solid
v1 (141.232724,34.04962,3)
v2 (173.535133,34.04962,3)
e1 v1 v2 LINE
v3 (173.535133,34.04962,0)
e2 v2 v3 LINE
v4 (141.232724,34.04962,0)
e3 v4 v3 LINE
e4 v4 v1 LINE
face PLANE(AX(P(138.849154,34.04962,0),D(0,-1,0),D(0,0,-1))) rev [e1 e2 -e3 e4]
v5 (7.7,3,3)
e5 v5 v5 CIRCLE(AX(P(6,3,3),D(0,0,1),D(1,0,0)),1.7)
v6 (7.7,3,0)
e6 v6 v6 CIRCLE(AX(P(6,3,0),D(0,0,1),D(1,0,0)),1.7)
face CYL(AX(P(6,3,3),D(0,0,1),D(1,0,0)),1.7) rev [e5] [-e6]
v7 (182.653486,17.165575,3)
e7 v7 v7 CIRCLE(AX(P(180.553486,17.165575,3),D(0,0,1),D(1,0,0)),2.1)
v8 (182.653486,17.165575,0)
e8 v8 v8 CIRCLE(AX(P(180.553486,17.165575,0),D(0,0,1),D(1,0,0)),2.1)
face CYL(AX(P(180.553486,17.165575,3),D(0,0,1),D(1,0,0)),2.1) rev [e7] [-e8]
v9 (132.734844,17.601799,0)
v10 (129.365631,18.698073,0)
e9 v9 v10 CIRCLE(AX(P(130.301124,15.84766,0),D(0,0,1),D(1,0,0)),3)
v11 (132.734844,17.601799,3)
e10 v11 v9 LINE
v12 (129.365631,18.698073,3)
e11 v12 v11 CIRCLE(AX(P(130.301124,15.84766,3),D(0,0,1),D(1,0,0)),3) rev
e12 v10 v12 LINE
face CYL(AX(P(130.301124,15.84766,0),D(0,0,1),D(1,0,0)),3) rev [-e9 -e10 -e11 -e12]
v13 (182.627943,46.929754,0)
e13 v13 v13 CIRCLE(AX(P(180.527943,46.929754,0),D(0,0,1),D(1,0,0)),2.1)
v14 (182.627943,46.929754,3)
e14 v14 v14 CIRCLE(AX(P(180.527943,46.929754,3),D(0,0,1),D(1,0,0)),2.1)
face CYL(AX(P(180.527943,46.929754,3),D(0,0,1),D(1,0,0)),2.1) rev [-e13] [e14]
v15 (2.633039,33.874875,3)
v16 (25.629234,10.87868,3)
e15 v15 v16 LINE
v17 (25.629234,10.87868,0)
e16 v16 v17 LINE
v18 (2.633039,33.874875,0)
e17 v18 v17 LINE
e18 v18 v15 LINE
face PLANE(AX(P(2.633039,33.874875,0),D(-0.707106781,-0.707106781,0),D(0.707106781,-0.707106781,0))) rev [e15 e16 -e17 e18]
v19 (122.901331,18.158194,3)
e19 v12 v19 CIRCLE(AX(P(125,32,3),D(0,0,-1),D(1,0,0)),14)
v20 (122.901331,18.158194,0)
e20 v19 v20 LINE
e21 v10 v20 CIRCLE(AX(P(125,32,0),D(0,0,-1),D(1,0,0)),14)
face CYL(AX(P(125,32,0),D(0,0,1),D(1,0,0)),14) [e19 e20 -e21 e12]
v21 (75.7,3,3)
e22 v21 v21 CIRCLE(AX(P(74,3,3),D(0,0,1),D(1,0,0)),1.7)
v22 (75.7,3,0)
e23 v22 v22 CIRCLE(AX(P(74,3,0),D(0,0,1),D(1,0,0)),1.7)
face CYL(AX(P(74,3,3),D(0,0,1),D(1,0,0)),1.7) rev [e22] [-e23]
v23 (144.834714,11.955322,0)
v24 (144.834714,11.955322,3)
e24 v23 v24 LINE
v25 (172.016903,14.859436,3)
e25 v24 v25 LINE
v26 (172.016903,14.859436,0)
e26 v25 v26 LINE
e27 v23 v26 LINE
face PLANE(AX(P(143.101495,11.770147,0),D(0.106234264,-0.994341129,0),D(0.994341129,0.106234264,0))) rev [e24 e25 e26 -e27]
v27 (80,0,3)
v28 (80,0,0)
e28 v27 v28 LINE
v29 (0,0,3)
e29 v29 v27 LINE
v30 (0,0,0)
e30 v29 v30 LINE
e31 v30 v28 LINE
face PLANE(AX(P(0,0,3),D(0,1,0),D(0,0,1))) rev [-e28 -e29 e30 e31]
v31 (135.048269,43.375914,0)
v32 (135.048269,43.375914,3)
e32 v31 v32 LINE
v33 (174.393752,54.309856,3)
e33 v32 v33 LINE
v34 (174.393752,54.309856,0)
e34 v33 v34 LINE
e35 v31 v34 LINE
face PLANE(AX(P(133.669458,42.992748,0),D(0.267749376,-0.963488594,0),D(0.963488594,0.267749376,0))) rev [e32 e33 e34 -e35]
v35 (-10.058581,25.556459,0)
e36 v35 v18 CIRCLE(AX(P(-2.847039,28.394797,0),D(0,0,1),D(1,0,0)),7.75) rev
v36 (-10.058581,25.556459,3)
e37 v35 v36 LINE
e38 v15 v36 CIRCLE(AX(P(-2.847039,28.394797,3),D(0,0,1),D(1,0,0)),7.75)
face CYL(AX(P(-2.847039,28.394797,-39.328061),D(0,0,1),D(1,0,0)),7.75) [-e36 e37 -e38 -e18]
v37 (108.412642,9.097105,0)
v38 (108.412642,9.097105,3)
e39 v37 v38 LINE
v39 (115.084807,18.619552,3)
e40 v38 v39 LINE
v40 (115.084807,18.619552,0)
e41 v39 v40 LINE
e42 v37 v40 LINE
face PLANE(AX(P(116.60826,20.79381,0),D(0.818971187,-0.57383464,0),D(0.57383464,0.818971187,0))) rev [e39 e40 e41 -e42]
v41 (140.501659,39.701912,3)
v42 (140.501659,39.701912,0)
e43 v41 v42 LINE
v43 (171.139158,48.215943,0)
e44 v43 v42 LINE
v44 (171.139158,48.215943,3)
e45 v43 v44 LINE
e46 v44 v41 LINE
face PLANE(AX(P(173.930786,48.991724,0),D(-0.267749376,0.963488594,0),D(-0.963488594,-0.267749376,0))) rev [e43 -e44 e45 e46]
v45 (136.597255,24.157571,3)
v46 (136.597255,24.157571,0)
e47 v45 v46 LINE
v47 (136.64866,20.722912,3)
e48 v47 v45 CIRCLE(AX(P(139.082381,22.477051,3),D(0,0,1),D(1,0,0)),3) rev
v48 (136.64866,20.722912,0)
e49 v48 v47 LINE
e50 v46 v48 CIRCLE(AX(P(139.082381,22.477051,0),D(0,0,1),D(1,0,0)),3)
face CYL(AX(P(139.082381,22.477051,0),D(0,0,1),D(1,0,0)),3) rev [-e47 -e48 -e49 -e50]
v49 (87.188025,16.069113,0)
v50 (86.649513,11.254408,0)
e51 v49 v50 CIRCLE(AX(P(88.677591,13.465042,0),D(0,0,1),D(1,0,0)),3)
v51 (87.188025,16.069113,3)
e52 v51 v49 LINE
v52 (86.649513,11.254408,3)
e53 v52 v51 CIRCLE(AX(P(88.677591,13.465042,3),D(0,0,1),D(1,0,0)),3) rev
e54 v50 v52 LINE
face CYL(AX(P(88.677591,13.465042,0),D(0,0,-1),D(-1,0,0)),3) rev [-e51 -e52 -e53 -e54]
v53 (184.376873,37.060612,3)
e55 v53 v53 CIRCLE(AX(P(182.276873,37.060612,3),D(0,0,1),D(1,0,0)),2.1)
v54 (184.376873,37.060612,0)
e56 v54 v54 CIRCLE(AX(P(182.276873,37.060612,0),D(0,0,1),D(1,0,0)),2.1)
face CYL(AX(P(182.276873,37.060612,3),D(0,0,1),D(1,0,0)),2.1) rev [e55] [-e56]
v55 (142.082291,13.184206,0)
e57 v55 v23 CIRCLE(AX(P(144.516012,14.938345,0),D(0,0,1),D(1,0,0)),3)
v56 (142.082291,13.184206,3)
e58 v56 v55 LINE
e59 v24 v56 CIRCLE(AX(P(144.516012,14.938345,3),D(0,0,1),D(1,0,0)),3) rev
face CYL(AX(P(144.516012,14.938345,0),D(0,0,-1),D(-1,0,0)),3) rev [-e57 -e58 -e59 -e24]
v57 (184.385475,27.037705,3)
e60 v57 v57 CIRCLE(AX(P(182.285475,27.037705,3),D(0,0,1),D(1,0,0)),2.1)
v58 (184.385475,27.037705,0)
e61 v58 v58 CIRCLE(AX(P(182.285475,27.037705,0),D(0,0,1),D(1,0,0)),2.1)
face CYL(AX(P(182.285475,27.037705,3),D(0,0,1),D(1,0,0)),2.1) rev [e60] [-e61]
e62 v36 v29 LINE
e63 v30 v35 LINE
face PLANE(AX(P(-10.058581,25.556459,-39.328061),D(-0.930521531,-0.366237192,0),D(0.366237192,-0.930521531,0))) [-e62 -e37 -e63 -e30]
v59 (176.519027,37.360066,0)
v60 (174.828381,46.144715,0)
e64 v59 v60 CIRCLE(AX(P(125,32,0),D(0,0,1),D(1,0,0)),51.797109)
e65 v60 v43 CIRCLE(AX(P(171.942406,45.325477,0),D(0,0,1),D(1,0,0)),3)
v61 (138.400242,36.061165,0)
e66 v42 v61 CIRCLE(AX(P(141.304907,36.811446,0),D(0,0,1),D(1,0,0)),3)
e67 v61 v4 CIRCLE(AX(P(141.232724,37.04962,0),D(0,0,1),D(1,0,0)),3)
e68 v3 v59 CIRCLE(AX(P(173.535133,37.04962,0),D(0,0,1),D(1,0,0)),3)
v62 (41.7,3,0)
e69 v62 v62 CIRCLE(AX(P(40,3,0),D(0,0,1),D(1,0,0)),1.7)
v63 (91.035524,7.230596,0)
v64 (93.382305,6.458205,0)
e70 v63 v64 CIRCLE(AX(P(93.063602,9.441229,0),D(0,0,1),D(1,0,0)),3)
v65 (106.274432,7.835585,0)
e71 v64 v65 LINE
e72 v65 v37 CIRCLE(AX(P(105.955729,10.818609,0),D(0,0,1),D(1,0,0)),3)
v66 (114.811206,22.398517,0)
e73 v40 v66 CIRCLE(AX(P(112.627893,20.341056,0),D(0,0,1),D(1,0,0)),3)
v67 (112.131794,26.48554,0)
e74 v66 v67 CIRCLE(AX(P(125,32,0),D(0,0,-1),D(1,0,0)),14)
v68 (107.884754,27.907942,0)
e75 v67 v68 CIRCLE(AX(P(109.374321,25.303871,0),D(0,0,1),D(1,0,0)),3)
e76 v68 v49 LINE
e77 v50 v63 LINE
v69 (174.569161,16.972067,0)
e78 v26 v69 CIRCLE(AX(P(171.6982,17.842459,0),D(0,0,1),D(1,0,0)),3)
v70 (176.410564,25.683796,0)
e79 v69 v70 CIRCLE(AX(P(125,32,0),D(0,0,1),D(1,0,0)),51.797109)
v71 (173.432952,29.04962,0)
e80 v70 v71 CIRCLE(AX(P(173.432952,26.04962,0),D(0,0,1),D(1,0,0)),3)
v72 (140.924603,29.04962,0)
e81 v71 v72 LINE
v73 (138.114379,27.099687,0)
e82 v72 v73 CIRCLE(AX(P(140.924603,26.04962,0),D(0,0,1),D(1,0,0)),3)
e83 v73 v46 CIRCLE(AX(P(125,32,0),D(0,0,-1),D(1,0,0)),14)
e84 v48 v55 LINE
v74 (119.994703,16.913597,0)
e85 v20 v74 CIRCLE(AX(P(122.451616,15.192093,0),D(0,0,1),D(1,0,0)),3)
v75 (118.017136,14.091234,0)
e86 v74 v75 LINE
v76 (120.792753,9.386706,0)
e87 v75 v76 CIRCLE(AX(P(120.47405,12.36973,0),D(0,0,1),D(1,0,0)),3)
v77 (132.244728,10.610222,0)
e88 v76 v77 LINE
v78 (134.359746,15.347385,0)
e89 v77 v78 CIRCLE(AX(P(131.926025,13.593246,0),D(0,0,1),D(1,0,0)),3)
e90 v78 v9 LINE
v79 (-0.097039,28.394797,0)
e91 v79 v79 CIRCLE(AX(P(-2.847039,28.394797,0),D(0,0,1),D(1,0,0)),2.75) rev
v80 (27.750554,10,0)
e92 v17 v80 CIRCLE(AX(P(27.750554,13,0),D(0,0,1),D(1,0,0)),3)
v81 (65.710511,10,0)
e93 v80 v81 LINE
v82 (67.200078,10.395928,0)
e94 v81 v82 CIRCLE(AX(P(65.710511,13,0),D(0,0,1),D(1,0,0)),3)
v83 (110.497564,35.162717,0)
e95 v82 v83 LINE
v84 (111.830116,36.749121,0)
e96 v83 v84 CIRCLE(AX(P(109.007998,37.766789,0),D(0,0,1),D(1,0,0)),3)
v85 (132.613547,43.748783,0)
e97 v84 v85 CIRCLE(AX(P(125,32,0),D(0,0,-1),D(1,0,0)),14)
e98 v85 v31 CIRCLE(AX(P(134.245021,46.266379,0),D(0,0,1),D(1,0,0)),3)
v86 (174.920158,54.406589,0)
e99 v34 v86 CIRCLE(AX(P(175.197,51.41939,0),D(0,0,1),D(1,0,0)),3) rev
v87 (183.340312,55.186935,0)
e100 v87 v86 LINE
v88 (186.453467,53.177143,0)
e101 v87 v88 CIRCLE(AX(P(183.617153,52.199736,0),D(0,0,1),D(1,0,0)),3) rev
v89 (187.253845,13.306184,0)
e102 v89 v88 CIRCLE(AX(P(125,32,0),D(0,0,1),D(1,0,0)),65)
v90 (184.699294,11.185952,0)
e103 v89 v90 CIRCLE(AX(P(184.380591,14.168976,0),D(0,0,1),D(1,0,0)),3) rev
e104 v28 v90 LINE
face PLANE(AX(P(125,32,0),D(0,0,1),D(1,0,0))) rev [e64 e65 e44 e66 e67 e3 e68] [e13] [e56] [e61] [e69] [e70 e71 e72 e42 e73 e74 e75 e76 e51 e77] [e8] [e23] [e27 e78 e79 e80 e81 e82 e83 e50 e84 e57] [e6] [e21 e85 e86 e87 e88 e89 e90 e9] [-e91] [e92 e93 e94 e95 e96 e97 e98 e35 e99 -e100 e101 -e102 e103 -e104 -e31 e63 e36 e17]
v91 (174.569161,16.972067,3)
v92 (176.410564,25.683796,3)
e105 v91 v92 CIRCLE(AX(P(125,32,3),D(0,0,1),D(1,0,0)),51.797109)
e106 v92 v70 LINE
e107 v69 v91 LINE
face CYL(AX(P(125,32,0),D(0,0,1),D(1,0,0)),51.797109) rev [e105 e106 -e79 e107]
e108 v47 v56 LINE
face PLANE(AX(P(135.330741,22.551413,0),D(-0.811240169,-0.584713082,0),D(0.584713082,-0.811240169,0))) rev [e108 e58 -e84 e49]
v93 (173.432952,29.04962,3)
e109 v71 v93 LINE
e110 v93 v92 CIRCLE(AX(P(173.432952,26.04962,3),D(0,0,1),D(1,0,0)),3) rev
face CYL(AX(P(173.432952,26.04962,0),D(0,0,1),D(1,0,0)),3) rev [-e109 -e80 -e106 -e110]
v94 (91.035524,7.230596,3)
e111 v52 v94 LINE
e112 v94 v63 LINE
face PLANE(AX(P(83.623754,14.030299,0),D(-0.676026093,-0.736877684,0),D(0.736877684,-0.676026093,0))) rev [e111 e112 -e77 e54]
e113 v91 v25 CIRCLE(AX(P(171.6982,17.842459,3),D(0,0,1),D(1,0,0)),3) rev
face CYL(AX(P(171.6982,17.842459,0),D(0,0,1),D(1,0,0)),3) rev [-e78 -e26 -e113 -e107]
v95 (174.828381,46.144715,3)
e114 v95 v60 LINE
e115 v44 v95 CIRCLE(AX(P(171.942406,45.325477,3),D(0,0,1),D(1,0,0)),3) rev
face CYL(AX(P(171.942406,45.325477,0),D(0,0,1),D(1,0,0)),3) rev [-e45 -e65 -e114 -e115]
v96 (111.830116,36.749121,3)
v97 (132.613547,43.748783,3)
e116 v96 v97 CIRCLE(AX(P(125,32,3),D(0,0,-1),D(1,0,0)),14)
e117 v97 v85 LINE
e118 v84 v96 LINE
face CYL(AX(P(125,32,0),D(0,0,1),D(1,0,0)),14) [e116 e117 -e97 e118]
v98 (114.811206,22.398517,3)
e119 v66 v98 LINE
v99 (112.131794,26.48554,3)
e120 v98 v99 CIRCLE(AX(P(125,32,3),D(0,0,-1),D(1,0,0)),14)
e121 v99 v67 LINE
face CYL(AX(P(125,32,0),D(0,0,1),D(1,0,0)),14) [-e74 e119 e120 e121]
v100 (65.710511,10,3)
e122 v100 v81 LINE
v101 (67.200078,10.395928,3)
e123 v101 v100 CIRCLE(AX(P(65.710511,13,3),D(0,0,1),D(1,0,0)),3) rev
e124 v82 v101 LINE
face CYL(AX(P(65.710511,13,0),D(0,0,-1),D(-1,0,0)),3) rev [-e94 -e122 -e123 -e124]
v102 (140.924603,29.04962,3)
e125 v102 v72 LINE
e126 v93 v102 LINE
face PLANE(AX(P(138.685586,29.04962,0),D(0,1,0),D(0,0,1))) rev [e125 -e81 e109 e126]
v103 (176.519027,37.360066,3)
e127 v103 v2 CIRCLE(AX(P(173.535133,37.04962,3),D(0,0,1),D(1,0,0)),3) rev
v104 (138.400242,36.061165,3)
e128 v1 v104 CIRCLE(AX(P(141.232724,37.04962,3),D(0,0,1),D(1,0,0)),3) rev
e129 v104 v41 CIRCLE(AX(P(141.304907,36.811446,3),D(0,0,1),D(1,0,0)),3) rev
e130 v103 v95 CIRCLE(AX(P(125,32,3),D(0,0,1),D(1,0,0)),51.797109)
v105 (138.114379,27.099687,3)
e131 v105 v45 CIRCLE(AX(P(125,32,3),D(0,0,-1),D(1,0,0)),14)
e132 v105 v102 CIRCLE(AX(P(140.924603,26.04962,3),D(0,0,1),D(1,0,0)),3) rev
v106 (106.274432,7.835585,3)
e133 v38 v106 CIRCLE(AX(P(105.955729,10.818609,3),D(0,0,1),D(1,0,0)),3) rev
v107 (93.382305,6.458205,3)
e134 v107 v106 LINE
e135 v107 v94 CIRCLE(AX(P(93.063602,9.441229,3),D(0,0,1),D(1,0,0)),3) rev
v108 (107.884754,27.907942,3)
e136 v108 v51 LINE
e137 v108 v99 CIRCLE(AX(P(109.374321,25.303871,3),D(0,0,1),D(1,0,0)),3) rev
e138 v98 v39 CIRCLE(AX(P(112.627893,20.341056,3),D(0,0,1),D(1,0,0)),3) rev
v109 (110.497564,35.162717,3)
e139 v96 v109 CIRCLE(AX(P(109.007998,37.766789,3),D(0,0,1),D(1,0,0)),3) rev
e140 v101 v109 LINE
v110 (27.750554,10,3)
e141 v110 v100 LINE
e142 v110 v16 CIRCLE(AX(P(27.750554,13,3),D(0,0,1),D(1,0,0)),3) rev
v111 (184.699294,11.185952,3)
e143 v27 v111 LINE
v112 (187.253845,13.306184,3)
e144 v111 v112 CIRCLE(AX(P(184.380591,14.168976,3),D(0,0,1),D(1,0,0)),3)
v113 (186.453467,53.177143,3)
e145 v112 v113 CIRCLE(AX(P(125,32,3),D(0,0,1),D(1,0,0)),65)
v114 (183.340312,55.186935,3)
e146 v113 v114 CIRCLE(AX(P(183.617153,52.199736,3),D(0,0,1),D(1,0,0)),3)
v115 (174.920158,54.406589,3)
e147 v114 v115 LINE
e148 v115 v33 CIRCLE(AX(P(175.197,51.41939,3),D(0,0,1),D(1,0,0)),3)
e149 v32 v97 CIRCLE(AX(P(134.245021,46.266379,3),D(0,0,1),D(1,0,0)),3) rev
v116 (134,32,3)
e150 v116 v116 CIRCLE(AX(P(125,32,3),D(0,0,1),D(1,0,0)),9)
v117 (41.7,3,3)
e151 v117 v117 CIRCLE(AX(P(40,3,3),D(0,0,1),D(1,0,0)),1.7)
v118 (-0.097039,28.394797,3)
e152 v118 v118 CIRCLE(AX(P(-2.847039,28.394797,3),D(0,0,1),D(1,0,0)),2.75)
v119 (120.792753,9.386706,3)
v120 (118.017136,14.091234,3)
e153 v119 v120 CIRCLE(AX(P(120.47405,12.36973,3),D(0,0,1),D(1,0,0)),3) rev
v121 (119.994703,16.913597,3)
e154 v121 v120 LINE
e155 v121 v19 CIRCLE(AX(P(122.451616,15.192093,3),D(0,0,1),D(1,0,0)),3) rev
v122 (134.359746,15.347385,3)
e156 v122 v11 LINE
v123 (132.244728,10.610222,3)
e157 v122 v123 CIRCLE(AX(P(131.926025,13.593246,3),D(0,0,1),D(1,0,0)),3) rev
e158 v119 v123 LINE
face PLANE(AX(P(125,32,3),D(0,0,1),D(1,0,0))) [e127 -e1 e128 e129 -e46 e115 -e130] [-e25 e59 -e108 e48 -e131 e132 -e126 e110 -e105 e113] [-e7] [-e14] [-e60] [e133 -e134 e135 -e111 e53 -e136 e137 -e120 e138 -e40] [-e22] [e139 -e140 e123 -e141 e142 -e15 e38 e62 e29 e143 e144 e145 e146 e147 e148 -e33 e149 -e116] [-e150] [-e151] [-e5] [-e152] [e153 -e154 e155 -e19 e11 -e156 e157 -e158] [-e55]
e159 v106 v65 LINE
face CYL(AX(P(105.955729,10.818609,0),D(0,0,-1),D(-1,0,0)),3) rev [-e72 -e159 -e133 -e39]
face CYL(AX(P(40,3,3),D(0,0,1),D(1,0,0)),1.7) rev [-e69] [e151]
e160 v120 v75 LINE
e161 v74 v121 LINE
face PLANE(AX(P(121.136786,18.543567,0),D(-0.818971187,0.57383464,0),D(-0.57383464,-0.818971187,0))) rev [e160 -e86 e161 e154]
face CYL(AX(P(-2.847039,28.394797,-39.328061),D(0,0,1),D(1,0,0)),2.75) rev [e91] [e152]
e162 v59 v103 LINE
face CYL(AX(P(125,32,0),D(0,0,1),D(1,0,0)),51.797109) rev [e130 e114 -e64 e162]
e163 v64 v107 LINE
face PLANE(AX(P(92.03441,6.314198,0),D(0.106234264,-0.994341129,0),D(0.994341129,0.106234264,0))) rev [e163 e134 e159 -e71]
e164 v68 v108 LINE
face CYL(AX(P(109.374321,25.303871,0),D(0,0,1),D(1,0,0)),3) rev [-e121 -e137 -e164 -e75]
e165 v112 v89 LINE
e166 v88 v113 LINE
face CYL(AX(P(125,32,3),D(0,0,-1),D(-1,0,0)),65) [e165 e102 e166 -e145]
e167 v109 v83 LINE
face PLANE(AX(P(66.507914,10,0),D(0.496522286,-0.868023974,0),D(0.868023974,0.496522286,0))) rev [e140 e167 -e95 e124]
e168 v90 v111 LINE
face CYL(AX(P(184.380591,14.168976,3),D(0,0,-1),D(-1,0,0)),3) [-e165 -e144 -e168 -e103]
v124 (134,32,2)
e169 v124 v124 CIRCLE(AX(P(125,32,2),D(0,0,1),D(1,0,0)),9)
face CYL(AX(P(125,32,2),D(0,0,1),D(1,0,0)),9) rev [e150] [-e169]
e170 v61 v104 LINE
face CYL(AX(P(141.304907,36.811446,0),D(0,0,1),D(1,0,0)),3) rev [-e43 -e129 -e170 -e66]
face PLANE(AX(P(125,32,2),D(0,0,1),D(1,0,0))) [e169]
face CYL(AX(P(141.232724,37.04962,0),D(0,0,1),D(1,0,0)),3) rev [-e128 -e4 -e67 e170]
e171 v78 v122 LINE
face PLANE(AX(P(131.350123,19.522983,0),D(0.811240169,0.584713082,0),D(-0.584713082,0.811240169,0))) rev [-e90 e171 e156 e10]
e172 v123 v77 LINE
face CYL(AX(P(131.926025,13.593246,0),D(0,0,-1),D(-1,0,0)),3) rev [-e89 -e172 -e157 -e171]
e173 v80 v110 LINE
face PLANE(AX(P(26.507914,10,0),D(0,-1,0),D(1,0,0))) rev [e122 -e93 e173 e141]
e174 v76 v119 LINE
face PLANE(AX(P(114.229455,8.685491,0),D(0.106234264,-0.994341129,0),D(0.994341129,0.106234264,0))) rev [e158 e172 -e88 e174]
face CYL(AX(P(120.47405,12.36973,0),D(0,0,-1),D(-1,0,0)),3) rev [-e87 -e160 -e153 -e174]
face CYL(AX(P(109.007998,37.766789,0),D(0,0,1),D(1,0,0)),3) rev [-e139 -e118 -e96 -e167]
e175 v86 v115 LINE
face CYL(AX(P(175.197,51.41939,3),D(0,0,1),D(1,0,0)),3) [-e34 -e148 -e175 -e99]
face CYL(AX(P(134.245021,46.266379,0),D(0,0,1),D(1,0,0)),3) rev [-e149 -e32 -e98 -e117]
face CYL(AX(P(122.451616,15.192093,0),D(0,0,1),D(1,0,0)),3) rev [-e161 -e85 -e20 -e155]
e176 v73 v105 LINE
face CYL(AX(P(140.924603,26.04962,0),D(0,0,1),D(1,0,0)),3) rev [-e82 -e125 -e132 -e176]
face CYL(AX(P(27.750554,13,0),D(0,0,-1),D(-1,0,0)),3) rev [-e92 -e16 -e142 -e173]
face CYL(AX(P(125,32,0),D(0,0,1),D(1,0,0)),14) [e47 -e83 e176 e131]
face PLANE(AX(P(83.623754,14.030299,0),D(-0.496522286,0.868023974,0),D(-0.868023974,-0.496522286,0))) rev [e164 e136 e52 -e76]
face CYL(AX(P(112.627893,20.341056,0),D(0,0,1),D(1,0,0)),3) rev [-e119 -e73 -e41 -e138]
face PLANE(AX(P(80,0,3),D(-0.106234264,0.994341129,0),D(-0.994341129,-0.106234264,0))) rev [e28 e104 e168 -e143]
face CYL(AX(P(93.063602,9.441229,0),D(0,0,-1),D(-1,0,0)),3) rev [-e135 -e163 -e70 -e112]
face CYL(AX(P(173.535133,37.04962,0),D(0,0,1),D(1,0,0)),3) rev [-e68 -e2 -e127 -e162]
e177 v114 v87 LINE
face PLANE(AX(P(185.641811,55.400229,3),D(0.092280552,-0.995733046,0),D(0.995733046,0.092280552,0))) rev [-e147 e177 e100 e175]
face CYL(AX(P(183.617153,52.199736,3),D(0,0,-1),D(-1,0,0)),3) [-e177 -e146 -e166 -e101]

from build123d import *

# Parameters (mm, degrees)
EXTRUDE_1_DEPTH     = 3
HOLE_WIZARD_M31_D   = 3.4
SKETCH_5_R          = 2.749999999999999
EXTRUDE_2_DEPTH     = 3
CUT_EXTRUDE_1_DEPTH = 198.9348007797117
M5X0_81_D           = 4.2
CUT_EXTRUDE_2_DEPTH = 198.9348007797117
CUT_EXTRUDE_3_DEPTH = 198.9348007797117
FILLET_1_R          = 3
SKETCH_12_R         = 8.999999999999996
CUT_EXTRUDE_4_DEPTH = 1


with BuildPart() as part:
    # Эскиз1 → Бобышка-Вытянуть1 (new body)
    with BuildSketch(Plane.XY):
        with BuildLine():
            Line((0, 0), (80, 0))
            Line((80, 0), (186.64735263363326, 11.394080625595256))
            ThreePointArc((186.64735263363326, 11.394080625595256), (189.98303763522418, 33.48486352875775), (185.64181138843185, 55.40022887772366))
            Line((185.64181138843185, 55.40022887772366), (29.81788185582472, 40.959090919498855))
            Line((29.81788185582472, 40.959090919498855), (1.6e-16, 40.959090919498855))
            Line((1.6e-16, 40.959090919498855), (0, 0))
        make_face()
    extrude(amount=EXTRUDE_1_DEPTH)

    # Отверстие с зазором M31 (through all)
    with Locations(Plane.XY.offset(3)):
        with Locations((6, 3), (40, 3), (74, 3)):
            Hole(HOLE_WIZARD_M31_D / 2)

    # Эскиз5 → Бобышка-Вытянуть2 (add)
    with BuildSketch(Plane.XY.offset(3)):
        with BuildLine():
            Line((-10.05858051013897, 25.55645888767347), (0, 0))
            Line((0, 0), (0, 21.18668565496398))
            ThreePointArc((0, 21.18668565496398), (0.24099496955508215, 35.503000018294074), (-10.05858051013897, 25.55645888767347))
        make_face()
        with Locations((-2.8470386460772503, 28.39479712384004)):
            Circle(SKETCH_5_R, mode=Mode.SUBTRACT)
    extrude(amount=-EXTRUDE_2_DEPTH)

    # Эскиз6 → Вырез-Вытянуть1 (cut, through all)
    with BuildSketch(Plane.XY.offset(3)):
        with BuildLine():
            Line((2.6330389081184924, 33.874874678035766), (26.507913586154185, 10.000000000000002))
            Line((26.507913586154185, 10.000000000000002), (66.50791358615419, 10))
            Line((66.50791358615419, 10), (104.37682925914895, 47.8689156729949))
            Line((104.37682925914895, 47.8689156729949), (29.817881855824798, 40.95909091949886))
            Line((29.817881855824798, 40.95909091949886), (1.6e-16, 40.959090919498855))
            Line((1.6e-16, 40.959090919498855), (0, 35.60290859271609))
            ThreePointArc((0, 35.60290859271609), (1.4052244403019993, 34.874053149358424), (2.6330389081184924, 33.874874678035766))
        make_face()
    extrude(amount=-CUT_EXTRUDE_1_DEPTH, mode=Mode.SUBTRACT)

    # Отверстие обработанное метчиком M5x0.81 (through all)
    with Locations(Plane.XY.offset(3)):
        with Locations((180.527942872, 46.929754199), (182.276873258, 37.060611597), (182.285474835, 27.037704871), (180.553486246, 17.165574973)):
            Hole(M5X0_81_D / 2)

    # Эскиз10 → Вырез-Вытянуть2 (cut, through all)
    with BuildSketch(Plane.XY.offset(3)):
        with BuildLine():
            Line((66.50791358615419, 10), (111.50918528954904, 35.741379217384946))
            ThreePointArc((111.50918528954904, 35.741379217384946), (120.64604118056285, 45.30575223723353), (133.66945767503876, 42.9927477739058))
            Line((133.66945767503876, 42.9927477739058), (174.65262323365093, 54.38179491403086))
            Line((174.65262323365093, 54.38179491403086), (104.37682925914895, 47.8689156729949))
            Line((104.37682925914895, 47.8689156729949), (66.50791358615419, 10))
        make_face()
    extrude(amount=-CUT_EXTRUDE_2_DEPTH, mode=Mode.SUBTRACT)

    # Эскиз11 → Вырез-Вытянуть3 (cut, through all)
    with BuildSketch(Plane.XY.offset(3)):
        with BuildLine():
            Line((92.03441017428995, 6.314197935775633), (107.63021765734568, 7.980436088856215))
            Line((107.63021765734568, 7.980436088856215), (116.60825973560767, 20.79380995453953))
            ThreePointArc((116.60825973560767, 20.79380995453953), (113.01565006615179, 24.762917945534056), (111.17548635848748, 29.790289028937345))
            Line((111.17548635848748, 29.790289028937345), (83.6237542782258, 14.03029921690936))
            Line((83.6237542782258, 14.03029921690936), (92.03441017428995, 6.314197935775633))
        make_face()
        with BuildLine():
            Line((173.93078584223207, 48.99172434981097), (137.24012127463044, 38.79554495109394))
            ThreePointArc((137.24012127463044, 38.79554495109394), (138.25871477406997, 36.49516212609262), (138.84915367150305, 34.04962010701802))
            Line((138.84915367150305, 34.04962010701802), (176.75654119949715, 34.04962010701802))
            ThreePointArc((176.75654119949715, 34.04962010701802), (175.8950005059697, 41.62493755905363), (173.93078584223207, 48.99172434981097))
        make_face()
        with BuildLine():
            Line((121.13678636305278, 18.543567322826398), (114.22945460790407, 8.685490982627265))
            Line((114.22945460790407, 8.685490982627265), (137.37877384972535, 11.158737653597806))
            Line((137.37877384972535, 11.158737653597806), (131.35012272889716, 19.52298347648991))
            ThreePointArc((131.35012272889716, 19.52298347648991), (126.33641056880738, 18.063931444213534), (121.13678636305278, 18.543567322826398))
        make_face()
        with BuildLine():
            Line((143.10149490164468, 11.770146595809063), (173.95081110549165, 15.066052095485405))
            ThreePointArc((173.95081110549165, 15.066052095485405), (175.8152185482702, 21.96236763923512), (176.7130134299426, 29.049620107018022))
            Line((176.7130134299426, 29.049620107018022), (138.68558579261725, 29.049620107018022))
            ThreePointArc((138.68558579261725, 29.049620107018022), (137.43996226457978, 25.57759088380138), (135.33074101249935, 22.551413326181333))
            Line((135.33074101249935, 22.551413326181333), (143.10149490164468, 11.770146595809063))
        make_face()
    extrude(amount=-CUT_EXTRUDE_3_DEPTH, mode=Mode.SUBTRACT)

    # Скругление1
    # the kernel refuses this fillet: 3 mm, written as the material it adds along each edge
    with BuildSketch(Plane(origin=(133.66945767503876, 42.992747773905805, 3), x_dir=(-0.8130725400087585, 0.5821623868678788, 0), z_dir=(0, 0, -1))) as fillet_1_piece_1:
        with BuildLine():
            CenterArc((1.4378103136794376, 2.996771470104822), FILLET_1_R, 218.86683700391524, 48.47477501487009)
            Line((-0.8980091423480934, 1.1142339621535844), (0, 0))
            ThreePointArc((0, 0), (0.6493336900487631, 0.01506647284415901), (1.2986673800975244, 0))
        make_face()
    extrude(amount=3)
    with BuildSketch(Plane(origin=(111.50918528954904, 35.741379217384946, 3), x_dir=(-0.8680239741683529, -0.49652228577273216, 0), z_dir=(0, 0, -1))) as fillet_1_piece_2:
        with BuildLine():
            CenterArc((1.16542958022559, 2.9999999999999964), FILLET_1_R, 229.5997180782211, 40.4002819217792)
            ThreePointArc((-0.7789413643040896, 0.7153946445679564), (-0.382712836911811, 0.3650554500406897), (0, 0))
            Line((0, 0), (1.165429580225606, 1e-17))
        make_face()
    extrude(amount=3)
    with BuildSketch(Plane(origin=(92.03441017428995, 6.314197935775633, 3), x_dir=(0.9943411291859616, 0.10623426381910231, 0), z_dir=(0, 0, -1))) as fillet_1_piece_3:
        with BuildLine():
            CenterArc((FILLET_1_R * 0.451855277113, -FILLET_1_R), FILLET_1_R, 89.9999999999999, 48.632165419305906)
            Line((-FILLET_1_R * 0.298626929798, -FILLET_1_R * 0.339109345572), (0, 0))
            Line((0, 0), (FILLET_1_R * 0.451855277113, -1e-17))
        make_face()
    extrude(amount=3)
    with BuildSketch(Plane(origin=(83.6237542782258, 14.03029921690936, 3), x_dir=(0.8680239741683552, 0.496522285772728, 0), z_dir=(0, 0, -1))) as fillet_1_piece_4:
        with BuildLine():
            CenterArc((FILLET_1_R * 1.36872958736, FILLET_1_R), FILLET_1_R, 162.30406475526607, 107.69593524473399)
            Line((FILLET_1_R * 0.416046539376, FILLET_1_R * 1.30396547515), (0, 0))
            Line((0, 0), (FILLET_1_R * 1.36872958736, -5e-17))
        make_face()
    extrude(amount=3)
    with BuildSketch(Plane(origin=(111.17548635848748, 29.790289028937345, 3), x_dir=(0.2779694371109165, -0.960589918764631, 0), z_dir=(0, 0, -1))) as fillet_1_piece_5:
        with BuildLine():
            CenterArc((3.8089394275276667, 2.977268689428244), FILLET_1_R, 166.36886991345514, 96.57341947464624)
            Line((0.893440130163459, 3.684279189398942), (0, 0))
            ThreePointArc((0, 0), (1.720166193077011, 0.10607944933485743), (3.4403323861540267, -8e-17))
        make_face()
    extrude(amount=3)
    with BuildSketch(Plane(origin=(116.60825973560767, 20.79380995453953, 3), x_dir=(-0.5738346401441979, -0.8189711873873091, 0), z_dir=(0, 0, -1))) as fillet_1_piece_6:
        with BuildLine():
            CenterArc((2.6548645047083914, 3.0000000000000018), FILLET_1_R, 191.68179125859942, 78.31820874140055)
            ThreePointArc((-0.28299711772598396, 2.392571742979232), (-0.08993594197380265, 1.2023847782433434), (0, 0))
            Line((0, 0), (2.654864504708389, 0))
        make_face()
    extrude(amount=3)
    with BuildSketch(Plane(origin=(107.63021765734568, 7.980436088856215, 3), x_dir=(-0.9943411291859616, -0.10623426381910264, 0), z_dir=(0, 0, -1))) as fillet_1_piece_7:
        with BuildLine():
            CenterArc((FILLET_1_R * 0.4545006609, FILLET_1_R), FILLET_1_R, 221.11634455075327, 48.883655449246646)
            Line((-FILLET_1_R * 0.298875173788, FILLET_1_R * 0.342409814772), (0, 0))
            Line((0, 0), (FILLET_1_R * 0.4545006609, 0))
        make_face()
    extrude(amount=3)
    with BuildSketch(Plane(origin=(137.37877384972535, 11.158737653597806, 3), x_dir=(-0.9943411291859617, -0.10623426381910242, 0), z_dir=(0, 0, -1))) as fillet_1_piece_8:
        with BuildLine():
            CenterArc((FILLET_1_R * 1.72108797237, FILLET_1_R), FILLET_1_R, 150.3155592750541, 119.68444072494606)
            Line((FILLET_1_R * 0.852321942917, FILLET_1_R * 1.49522276409), (0, 0))
            Line((0, 0), (FILLET_1_R * 1.72108797237, -6e-17))
        make_face()
    extrude(amount=3)
    with BuildSketch(Plane(origin=(114.22945460790407, 8.685490982627265, 3), x_dir=(0.5738346401441975, 0.8189711873873095, 0), z_dir=(0, 0, -1))) as fillet_1_piece_9:
        with BuildLine():
            CenterArc((FILLET_1_R * 2.20021682261, FILLET_1_R), FILLET_1_R, 138.8836554492469, 131.11634455075307)
            Line((FILLET_1_R * 1.44684098792, FILLET_1_R * 1.65759018523), (0, 0))
            Line((0, 0), (FILLET_1_R * 2.20021682261, 2e-17))
        make_face()
    extrude(amount=3)
    with BuildSketch(Plane(origin=(121.13678636305278, 18.543567322826398, 3), x_dir=(-0.5738346401441984, -0.8189711873873087, 0), z_dir=(0, 0, -1))) as fillet_1_piece_10:
        with BuildLine():
            CenterArc((1.990265982493936, -3.0000000000000013), FILLET_1_R, 89.99999999999993, 63.60335445318877)
            ThreePointArc((-0.6969473887897009, -1.666251786432529), (-0.32157533753284756, -0.844376737614642), (0, 0))
            Line((0, 0), (1.9902659824939402, 5e-17))
        make_face()
    extrude(amount=3)
    with BuildSketch(Plane(origin=(131.35012272889716, 19.522983476489905, 3), x_dir=(0.5847130820131278, -0.8112401689528875, 0), z_dir=(0, 0, -1))) as fillet_1_piece_11:
        with BuildLine():
            CenterArc((2.3682065417982856, 3.0000000000000004), FILLET_1_R, 197.6131255819165, 72.3868744180835)
            ThreePointArc((-0.4911575816723561, 2.0922352675891354), (-0.20537262369653822, 1.0555561343908344), (0, 0))
            Line((0, 0), (2.368206541798286, 1e-17))
        make_face()
    extrude(amount=3)
    with BuildSketch(Plane(origin=(173.93078584223207, 48.99172434981097, 3), x_dir=(-0.9634885943550286, -0.26774937637232876, 0), z_dir=(0, 0, -1))) as fillet_1_piece_12:
        with BuildLine():
            CenterArc((2.897416461846995, -3.0000000000000013), FILLET_1_R, 90.00000000000013, 89.6828037551533)
            ThreePointArc((-0.1025375653525866, -2.9833917282944458), (-0.07276547265506263, -1.4909570345015974), (0, 0))
            Line((0, 0), (2.8974164618469884, -5e-17))
        make_face()
    extrude(amount=3)
    with BuildSketch(Plane(origin=(176.75654119949715, 34.04962010701802, 3), x_dir=(-1, 0, 0), z_dir=(0, 0, -1))) as fillet_1_piece_13:
        with BuildLine():
            CenterArc((3.221407714928148, 3), FILLET_1_R, 174.06028761643057, 95.93971238356943)
            ThreePointArc((0.23751372052348074, 3.310445857043881), (0.09223500645424565, 1.6571257852503223), (0, 0))
            Line((0, 0), (3.221407714928148, 0))
        make_face()
    extrude(amount=3)
    with BuildSketch(Plane(origin=(138.84915367150305, 34.04962010701802, 3), x_dir=(-0.22238352713061194, 0.9749592642059198, 0), z_dir=(0, 0, -1))) as fillet_1_piece_14:
        with BuildLine():
            CenterArc((2.394810958848804, 2.9910348047399777), FILLET_1_R, 192.84906769128517, 72.72030630224907)
            Line((-0.5300668337689619, 2.32388422334817), (0, 0))
            ThreePointArc((0, 0), (1.081527529802683, 0.04183757788016305), (2.163055059605388, 0))
        make_face()
    extrude(amount=3)
    with BuildSketch(Plane(origin=(137.24012127463044, 38.79554495109394, 3), x_dir=(0.9634885943550292, 0.2677493763723269, 0), z_dir=(0, 0, -1))) as fillet_1_piece_15:
        with BuildLine():
            CenterArc((3.3851332754644625, 3.0000000000000013), FILLET_1_R, 179.08948046092507, 90.91051953907493)
            ThreePointArc((0.3855120801952658, 3.047672684965048), (0.27660128884680796, 1.5132304278712665), (0, 0))
            Line((0, 0), (3.3851332754644634, 6e-17))
        make_face()
    extrude(amount=3)
    with BuildSketch(Plane(origin=(143.10149490164468, 11.770146595809063, 3), x_dir=(0.9943411291859617, 0.10623426381910227, 0), z_dir=(0, 0, -1))) as fillet_1_piece_16:
        with BuildLine():
            CenterArc((FILLET_1_R * 0.581027824292, -FILLET_1_R), FILLET_1_R, 90.00000000000017, 60.3155592750542)
            Line((-FILLET_1_R * 0.287738205159, -FILLET_1_R * 0.50477723591), (0, 0))
            Line((0, 0), (FILLET_1_R * 0.581027824292, -1e-17))
        make_face()
    extrude(amount=3)
    with BuildSketch(Plane(origin=(135.33074101249935, 22.551413326181333, 3), x_dir=(0.6191906205716086, 0.7852407117541386, 0), z_dir=(0, 0, -1))) as fillet_1_piece_17:
        with BuildLine():
            CenterArc((2.264587612579221, 2.9919845725048013), FILLET_1_R, 195.96022348085205, 69.85051867741447)
            Line((-0.6197708484362799, 2.1670747178126035), (0, 0))
            ThreePointArc((0, 0), (1.0227169863260859, 0.03740532831092148), (2.0454339726521837, 5e-17))
        make_face()
    extrude(amount=3)
    with BuildSketch(Plane(origin=(138.68558579261725, 29.049620107018022, 3), x_dir=(1, 0, 0), z_dir=(0, 0, -1))) as fillet_1_piece_18:
        with BuildLine():
            CenterArc((2.239017157823781, 3), FILLET_1_R, 200.4886819411101, 69.51131805888991)
            ThreePointArc((-0.5712068922540539, 1.9499329600620143), (-0.2501815737843174, 0.9853428458000373), (0, 0))
            Line((0, 0), (2.239017157823781, 0))
        make_face()
    extrude(amount=3)
    with BuildSketch(Plane(origin=(176.7130134299426, 29.049620107018022, 3), x_dir=(-0.08949841173945887, -0.9959869649227917, 0), z_dir=(0, 0, -1))) as fillet_1_piece_19:
        with BuildLine():
            CenterArc((3.2815211967518683, 2.998403344451645), FILLET_1_R, 174.86524824854192, 97.00415022459947)
            Line((0.29356030198349303, 3.266898579670022), (0, 0))
            ThreePointArc((0, 0), (1.6896926532610193, -0.02756738048459419), (3.37938530652206, -2e-17))
        make_face()
    extrude(amount=3)
    with BuildSketch(Plane(origin=(173.95081110549165, 15.066052095485404, 3), x_dir=(-0.994341129185962, -0.1062342638191007, 0), z_dir=(0, 0, -1))) as fillet_1_piece_20:
        with BuildLine():
            CenterArc((1.944914405279492, 2.9999999999999996), FILLET_1_R, 202.9640654934915, 67.03593450650857)
            ThreePointArc((-0.8173347828283964, 1.8295387991063596), (-0.41751534735678364, 0.9108166317013427), (0, 0))
            Line((0, 0), (1.944914405279496, -1e-17))
        make_face()
    extrude(amount=3)
    with BuildSketch(Plane(origin=(66.50791358615419, 10, 3), x_dir=(-1, 0, 0), z_dir=(0, 0, -1))) as fillet_1_piece_21:
        with BuildLine():
            CenterArc((FILLET_1_R * 0.265800810182, FILLET_1_R), FILLET_1_R, 240.229818231195, 29.770181768805003)
            Line((-FILLET_1_R * 0.230721475591, FILLET_1_R * 0.131976025832), (0, 0))
            Line((0, 0), (FILLET_1_R * 0.265800810182, 0))
        make_face()
    extrude(amount=3)
    with BuildSketch(Plane(origin=(26.507913586154185, 10.000000000000002, 3), x_dir=(-0.7071067811865482, 0.7071067811865468, 0), z_dir=(0, 0, -1))) as fillet_1_piece_22:
        with BuildLine():
            CenterArc((FILLET_1_R * 0.414213562373, FILLET_1_R), FILLET_1_R, 225.00000000000006, 45.000000000000114)
            Line((-FILLET_1_R * 0.292893218813, FILLET_1_R * 0.292893218813), (0, 0))
            Line((0, 0), (FILLET_1_R * 0.414213562373, 1e-17))
        make_face()
    extrude(amount=3)
    # the kernel refuses this fillet: 3 mm, written as the material it takes off along each edge
    with BuildSketch(Plane(origin=(174.6526232336509, 54.381794914030856, 3.6717035747929345), x_dir=(-0.9634885943550205, -0.26774937637235796, 0), z_dir=(0, 0, -1))) as fillet_1_2_piece_1:
        with BuildLine():
            CenterArc((FILLET_1_R * 0.0895604766391, -FILLET_1_R), FILLET_1_R, 90.00000000000188, 10.235566175230105)
            Line((-FILLET_1_R * 0.0881351658569, -FILLET_1_R * 0.0159145064386), (0, 0))
            Line((0, 0), (FILLET_1_R * 0.0895604766391, -1e-17))
        make_face()
    extrude(amount=4.34340714958587, mode=Mode.SUBTRACT)
    with BuildSketch(Plane(origin=(185.64181138843185, 55.40022887772366, -5.916554139644239), x_dir=(0.3429596926027861, -0.9393501206950486, 0), z_dir=(0, 0, 1))) as fillet_1_2_piece_2:
        with BuildLine():
            CenterArc((2.312007309953282, -2.999502837675169), FILLET_1_R, 88.95688520370253, 76.28063656309585)
            Line((-0.5889640915743037, -2.2350651832395365), (0, 0))
            ThreePointArc((0, 0), (1.183310827928844, 0.010771850371206), (2.366621655857689, 6e-17))
        make_face()
    extrude(amount=14.833108279288478, mode=Mode.SUBTRACT)
    with BuildSketch(Plane(origin=(186.64735263363326, 11.394080625595256, -5.014960799028406), x_dir=(-0.9943411291859617, -0.10623426381910225, 0), z_dir=(0, 0, 1))) as fillet_1_2_piece_3:
        with BuildLine():
            CenterArc((1.9591455422097777, -2.9999999999999996), FILLET_1_R, 89.99999999999983, 67.1875610802881)
            ThreePointArc((-0.806191458360402, -1.8368528582859858), (-0.41018210878156197, -0.9153162297170893), (0, 0))
            Line((0, 0), (1.9591455422097865, 2e-17))
        make_face()
    extrude(amount=13.029921598056813, mode=Mode.SUBTRACT)

    # Эскиз12 → Вырез-Вытянуть4 (cut)
    with BuildSketch(Plane.XY.offset(3)):
        with Locations((124.99999999999999, 31.999999999999986)):
            Circle(SKETCH_12_R)
    extrude(amount=-CUT_EXTRUDE_4_DEPTH, mode=Mode.SUBTRACT)


solid = part.part
